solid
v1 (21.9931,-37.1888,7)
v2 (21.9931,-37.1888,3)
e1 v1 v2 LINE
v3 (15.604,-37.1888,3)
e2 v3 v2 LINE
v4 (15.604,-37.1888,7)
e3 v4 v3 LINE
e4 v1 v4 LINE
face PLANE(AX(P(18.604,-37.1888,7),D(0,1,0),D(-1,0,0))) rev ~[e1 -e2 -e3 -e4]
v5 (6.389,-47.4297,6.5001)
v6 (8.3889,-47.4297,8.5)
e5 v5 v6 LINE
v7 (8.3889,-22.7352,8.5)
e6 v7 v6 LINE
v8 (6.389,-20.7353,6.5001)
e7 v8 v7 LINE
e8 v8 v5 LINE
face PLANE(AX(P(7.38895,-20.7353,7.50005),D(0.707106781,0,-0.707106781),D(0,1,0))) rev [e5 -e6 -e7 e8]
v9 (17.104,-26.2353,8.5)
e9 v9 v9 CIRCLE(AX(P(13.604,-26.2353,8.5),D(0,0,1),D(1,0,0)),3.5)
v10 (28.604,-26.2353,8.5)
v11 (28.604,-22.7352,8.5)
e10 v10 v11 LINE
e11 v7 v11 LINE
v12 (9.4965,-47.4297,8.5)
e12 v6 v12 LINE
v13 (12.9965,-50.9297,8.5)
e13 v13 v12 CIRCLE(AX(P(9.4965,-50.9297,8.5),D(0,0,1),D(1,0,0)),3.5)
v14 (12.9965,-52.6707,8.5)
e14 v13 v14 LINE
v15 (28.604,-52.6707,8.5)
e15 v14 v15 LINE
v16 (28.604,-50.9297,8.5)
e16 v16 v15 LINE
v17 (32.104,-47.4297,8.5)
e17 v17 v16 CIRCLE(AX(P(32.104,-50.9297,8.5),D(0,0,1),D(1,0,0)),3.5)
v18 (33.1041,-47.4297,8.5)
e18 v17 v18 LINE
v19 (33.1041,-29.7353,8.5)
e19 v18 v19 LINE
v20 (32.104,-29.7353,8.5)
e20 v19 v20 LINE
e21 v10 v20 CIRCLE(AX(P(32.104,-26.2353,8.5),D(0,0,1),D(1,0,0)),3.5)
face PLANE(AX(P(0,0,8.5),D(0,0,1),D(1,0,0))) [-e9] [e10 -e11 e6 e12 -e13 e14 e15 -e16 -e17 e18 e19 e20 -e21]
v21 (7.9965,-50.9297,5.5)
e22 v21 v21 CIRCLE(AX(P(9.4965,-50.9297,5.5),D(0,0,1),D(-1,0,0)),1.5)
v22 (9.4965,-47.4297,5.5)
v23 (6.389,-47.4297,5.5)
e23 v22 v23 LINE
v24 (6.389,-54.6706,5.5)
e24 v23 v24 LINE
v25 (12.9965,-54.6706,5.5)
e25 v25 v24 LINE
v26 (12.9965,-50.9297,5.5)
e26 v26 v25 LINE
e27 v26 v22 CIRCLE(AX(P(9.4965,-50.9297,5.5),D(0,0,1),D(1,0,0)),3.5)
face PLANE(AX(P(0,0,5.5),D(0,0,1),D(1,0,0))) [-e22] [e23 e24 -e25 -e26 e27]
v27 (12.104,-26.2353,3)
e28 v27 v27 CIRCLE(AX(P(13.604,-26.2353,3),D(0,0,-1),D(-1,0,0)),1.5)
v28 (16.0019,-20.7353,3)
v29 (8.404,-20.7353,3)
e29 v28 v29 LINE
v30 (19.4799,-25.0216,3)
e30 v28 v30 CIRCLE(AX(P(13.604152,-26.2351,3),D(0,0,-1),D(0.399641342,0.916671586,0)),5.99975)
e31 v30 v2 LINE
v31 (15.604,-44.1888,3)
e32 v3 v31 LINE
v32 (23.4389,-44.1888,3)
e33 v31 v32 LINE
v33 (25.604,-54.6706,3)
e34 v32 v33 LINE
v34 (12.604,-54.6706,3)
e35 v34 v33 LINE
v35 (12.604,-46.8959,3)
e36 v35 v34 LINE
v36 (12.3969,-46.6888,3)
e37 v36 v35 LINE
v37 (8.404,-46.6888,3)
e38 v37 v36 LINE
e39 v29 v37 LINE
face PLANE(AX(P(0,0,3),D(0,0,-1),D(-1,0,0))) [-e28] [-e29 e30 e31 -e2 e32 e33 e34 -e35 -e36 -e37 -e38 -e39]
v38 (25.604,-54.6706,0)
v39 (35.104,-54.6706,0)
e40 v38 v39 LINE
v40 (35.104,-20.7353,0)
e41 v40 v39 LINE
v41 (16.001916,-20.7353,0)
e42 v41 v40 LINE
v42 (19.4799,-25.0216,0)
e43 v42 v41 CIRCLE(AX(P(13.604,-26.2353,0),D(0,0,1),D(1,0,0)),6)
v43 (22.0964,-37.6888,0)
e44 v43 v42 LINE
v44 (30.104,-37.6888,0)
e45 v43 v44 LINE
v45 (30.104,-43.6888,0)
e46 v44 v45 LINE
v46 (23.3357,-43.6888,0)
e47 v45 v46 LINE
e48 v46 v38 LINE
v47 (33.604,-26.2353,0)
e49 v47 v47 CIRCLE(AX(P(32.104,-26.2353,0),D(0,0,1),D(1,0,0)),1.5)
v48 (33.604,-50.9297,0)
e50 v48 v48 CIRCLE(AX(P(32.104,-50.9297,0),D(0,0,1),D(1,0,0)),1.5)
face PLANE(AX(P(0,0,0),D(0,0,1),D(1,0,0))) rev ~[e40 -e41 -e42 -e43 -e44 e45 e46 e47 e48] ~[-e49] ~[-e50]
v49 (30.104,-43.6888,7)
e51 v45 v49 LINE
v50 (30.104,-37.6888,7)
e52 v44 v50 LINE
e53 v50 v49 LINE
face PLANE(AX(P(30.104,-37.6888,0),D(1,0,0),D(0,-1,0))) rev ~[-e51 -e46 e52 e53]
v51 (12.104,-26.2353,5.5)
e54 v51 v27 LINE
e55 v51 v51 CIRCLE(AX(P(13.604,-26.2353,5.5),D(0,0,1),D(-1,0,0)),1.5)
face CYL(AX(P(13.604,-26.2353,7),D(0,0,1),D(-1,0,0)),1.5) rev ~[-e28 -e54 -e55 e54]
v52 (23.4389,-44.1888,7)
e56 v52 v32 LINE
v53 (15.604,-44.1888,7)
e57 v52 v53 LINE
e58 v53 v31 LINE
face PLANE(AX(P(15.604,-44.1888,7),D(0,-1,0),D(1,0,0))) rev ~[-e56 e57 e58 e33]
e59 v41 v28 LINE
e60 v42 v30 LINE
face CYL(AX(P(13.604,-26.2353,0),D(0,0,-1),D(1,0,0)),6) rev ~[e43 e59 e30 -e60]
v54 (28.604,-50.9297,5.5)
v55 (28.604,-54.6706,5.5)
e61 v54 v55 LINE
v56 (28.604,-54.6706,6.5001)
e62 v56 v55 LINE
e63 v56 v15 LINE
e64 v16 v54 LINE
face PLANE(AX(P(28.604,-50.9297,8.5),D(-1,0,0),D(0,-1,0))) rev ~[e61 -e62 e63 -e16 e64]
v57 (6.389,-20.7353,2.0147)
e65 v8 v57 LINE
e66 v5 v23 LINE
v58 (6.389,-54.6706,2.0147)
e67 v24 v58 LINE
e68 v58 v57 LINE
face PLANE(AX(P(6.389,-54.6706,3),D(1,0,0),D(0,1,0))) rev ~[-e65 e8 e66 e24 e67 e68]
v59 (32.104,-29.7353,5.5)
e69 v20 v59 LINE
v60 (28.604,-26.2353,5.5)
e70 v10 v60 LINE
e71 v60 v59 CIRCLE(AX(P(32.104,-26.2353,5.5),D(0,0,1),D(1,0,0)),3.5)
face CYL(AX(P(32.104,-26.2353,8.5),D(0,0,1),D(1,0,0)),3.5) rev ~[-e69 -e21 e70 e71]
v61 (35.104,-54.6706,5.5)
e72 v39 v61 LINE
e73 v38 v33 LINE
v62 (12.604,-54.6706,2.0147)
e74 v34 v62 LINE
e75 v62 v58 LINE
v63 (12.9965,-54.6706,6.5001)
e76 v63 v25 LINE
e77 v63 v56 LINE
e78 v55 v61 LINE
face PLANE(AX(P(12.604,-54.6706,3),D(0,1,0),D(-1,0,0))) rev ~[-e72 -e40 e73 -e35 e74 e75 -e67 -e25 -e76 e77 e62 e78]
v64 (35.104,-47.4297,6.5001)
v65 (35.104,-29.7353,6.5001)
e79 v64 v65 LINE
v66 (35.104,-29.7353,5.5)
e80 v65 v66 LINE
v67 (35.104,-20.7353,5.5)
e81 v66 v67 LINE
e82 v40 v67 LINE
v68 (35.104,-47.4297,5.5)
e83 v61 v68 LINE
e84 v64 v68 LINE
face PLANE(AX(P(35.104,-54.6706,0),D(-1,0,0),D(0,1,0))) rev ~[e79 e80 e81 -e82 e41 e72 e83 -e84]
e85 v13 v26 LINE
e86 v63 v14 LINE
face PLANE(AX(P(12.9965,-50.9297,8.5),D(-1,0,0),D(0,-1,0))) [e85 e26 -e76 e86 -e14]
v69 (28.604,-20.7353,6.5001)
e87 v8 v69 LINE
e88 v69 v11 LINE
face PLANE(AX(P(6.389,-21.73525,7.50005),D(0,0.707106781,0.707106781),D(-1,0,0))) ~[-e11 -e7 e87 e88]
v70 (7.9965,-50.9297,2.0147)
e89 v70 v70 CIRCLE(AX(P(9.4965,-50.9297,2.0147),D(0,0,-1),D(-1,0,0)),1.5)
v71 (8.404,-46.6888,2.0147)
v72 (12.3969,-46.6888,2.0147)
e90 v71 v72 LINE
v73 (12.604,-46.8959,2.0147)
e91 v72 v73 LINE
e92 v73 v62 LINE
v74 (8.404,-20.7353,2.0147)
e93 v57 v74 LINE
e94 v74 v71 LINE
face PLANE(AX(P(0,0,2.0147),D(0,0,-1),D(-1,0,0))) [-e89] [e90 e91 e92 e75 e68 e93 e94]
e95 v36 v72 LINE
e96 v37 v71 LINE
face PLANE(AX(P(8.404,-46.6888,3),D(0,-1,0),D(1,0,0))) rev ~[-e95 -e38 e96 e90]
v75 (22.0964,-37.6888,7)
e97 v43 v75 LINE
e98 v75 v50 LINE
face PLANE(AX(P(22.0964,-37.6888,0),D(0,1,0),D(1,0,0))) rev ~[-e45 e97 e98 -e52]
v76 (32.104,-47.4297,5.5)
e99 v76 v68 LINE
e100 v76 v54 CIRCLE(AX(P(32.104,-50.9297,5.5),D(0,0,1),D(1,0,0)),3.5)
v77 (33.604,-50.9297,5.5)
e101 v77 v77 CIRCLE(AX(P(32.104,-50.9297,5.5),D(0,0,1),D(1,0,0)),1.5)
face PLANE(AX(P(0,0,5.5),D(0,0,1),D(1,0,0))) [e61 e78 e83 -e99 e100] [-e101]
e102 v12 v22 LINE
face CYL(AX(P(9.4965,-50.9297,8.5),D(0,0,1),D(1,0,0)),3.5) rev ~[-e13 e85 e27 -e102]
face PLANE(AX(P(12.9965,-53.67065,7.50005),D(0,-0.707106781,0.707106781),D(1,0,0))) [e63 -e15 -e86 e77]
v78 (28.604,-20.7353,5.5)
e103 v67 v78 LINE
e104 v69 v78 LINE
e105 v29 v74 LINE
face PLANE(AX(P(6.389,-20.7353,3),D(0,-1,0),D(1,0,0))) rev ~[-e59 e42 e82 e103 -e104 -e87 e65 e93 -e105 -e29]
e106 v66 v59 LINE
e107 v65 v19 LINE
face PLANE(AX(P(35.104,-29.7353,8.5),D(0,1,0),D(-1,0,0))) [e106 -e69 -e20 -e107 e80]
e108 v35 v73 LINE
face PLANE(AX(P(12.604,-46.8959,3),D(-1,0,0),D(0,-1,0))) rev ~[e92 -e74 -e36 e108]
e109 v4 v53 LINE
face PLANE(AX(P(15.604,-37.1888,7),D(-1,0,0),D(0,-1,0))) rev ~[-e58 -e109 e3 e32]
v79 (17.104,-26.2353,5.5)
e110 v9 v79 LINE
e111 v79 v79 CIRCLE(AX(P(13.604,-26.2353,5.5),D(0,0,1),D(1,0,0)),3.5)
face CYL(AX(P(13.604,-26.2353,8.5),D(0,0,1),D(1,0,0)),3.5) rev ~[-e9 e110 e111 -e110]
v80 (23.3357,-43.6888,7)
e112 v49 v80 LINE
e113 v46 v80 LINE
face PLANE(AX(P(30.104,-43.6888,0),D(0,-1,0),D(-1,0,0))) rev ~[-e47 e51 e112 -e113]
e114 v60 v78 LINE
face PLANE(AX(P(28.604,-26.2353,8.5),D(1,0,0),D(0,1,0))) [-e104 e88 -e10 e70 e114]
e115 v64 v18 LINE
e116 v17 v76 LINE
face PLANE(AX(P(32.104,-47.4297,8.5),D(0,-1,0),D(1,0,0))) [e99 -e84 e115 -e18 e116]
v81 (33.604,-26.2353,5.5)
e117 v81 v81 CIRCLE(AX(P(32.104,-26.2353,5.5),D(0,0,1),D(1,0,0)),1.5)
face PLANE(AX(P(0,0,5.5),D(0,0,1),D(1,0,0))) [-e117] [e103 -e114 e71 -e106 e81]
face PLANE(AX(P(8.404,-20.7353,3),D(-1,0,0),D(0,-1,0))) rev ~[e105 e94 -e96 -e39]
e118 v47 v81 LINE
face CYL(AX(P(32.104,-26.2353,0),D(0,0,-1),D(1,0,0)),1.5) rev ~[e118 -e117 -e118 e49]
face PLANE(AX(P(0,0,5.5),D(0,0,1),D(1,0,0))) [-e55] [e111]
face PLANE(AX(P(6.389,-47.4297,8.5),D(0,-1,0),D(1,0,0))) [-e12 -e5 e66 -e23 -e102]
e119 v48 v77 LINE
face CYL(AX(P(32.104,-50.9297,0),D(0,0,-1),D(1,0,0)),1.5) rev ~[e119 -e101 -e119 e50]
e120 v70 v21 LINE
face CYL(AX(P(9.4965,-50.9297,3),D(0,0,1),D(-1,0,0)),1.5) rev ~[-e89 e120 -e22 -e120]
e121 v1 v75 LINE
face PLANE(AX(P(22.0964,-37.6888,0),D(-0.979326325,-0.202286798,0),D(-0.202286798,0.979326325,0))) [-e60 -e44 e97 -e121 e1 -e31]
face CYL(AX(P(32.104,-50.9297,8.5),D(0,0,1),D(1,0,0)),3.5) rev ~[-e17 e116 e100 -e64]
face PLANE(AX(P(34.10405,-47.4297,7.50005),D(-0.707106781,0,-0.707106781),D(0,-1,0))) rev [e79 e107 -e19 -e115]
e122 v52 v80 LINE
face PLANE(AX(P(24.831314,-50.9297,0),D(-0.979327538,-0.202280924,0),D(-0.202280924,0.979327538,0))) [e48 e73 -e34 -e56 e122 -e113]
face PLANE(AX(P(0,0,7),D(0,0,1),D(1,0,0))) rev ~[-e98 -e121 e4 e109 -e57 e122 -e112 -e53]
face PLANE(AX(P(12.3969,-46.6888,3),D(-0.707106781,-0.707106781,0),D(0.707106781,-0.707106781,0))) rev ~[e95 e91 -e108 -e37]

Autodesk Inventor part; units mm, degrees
ref_plane "YZ Plane" through (0, 0, 0) normal (1, 0, 0) x (0, 1, 0)
ref_plane "XZ Plane" through (0, 0, 0) normal (0, 1, 0) x (-1, 0, 0)
sketch "Sketch1" plane through (0, 0, 0) normal (0, 0, 1) x (1, 0, 0)
  circle A0 centre (13.604, -26.2353) radius 1.6 projected
  line L0 (18.604, -44.1888) -> (15.604, -44.1888) projected
  line L1 (15.604, -44.1888) -> (15.604, -37.1888) projected
  line L2 (15.604, -37.1888) -> (18.604, -37.1888) projected
  line L3 (18.604, -26.2353) -> (18.604, -37.1888) projected
  arc A1 (18.604, -26.2353) -> (8.604, -26.2353) centre (13.604, -26.2353) ccw projected
  line L4 (8.604, -26.2353) -> (8.604, -45.6888) projected
  line L5 (9.104, -46.1888) -> (8.604, -45.6888) projected
  line L6 (9.104, -46.1888) -> (12.604, -46.1888) projected
  line L7 (13.104, -46.6888) -> (12.604, -46.1888) projected
  line L8 (13.104, -46.6888) -> (13.104, -55.1706) projected
  line L9 (12.604, -55.6706) -> (13.104, -55.1706) projected
  line L10 (12.604, -55.6706) -> (3.2048, -55.6706) projected
  line L11 (3.2048, -55.6706) -> (3.2048, -62.5334) projected
  line L12 (3.2048, -62.5334) -> (8.604, -62.5334) projected
  line L13 (8.604, -62.5334) -> (8.604, -81.1802) projected
  line L14 (8.604, -81.1802) -> (9.604, -81.1802) projected
  line L15 (9.604, -62.5334) -> (9.604, -81.1802) projected
  line L16 (9.604, -62.5334) -> (17.604, -62.5334) projected
  line L17 (17.604, -81.1802) -> (17.604, -62.5334) projected
  line L18 (17.604, -81.1802) -> (18.604, -81.1802) projected
  line L19 (18.604, -44.1888) -> (18.604, -81.1802) projected
  line L20 (19.104, -37.6888) -> (16.104, -37.6888)
  line L21 (16.104, -37.6888) -> (16.104, -43.6888)
  line L22 (16.104, -43.6888) -> (19.104, -43.6888)
  line L23 (19.104, -43.6888) -> (19.104, -81.6802)
  line L24 (19.104, -81.6802) -> (17.104, -81.6802)
  line L25 (17.104, -81.6802) -> (17.104, -63.0334)
  line L26 (17.104, -63.0334) -> (10.104, -63.0334)
  line L27 (10.104, -63.0334) -> (10.104, -81.6802)
  line L28 (10.104, -81.6802) -> (8.104, -81.6802)
  line L29 (8.104, -81.6802) -> (8.104, -63.0334)
  line L30 (8.104, -63.0334) -> (2.7048, -63.0334)
  line L31 (2.7048, -63.0334) -> (2.7048, -55.1706)
  line L32 (2.7048, -55.1706) -> (12.3969, -55.1706)
  line L33 (12.3969, -55.1706) -> (12.604, -54.9635)
  line L34 (12.604, -54.9635) -> (12.604, -46.8959)
  line L35 (12.604, -46.8959) -> (12.3969, -46.6888)
  line L36 (12.3969, -46.6888) -> (8.8969, -46.6888)
  line L37 (8.8969, -46.6888) -> (8.104, -45.8959)
  line L38 (8.104, -45.8959) -> (8.104, -26.2353)
  arc A2 (19.104, -26.2353) -> (8.104, -26.2353) centre (13.604, -26.2353) ccw
  line L39 (19.104, -26.2353) -> (19.104, -37.6888)
  line L40 (30.104, -37.6888) -> (30.104, -43.6888)
  line L41 (19.604, -38.1888) -> (16.604, -38.1888)
  line L42 (16.604, -38.1888) -> (16.604, -43.1888)
  line L43 (16.604, -43.1888) -> (19.604, -43.1888)
  line L44 (19.604, -43.1888) -> (19.604, -82.1802)
  line L45 (19.604, -82.1802) -> (16.604, -82.1802)
  line L46 (16.604, -82.1802) -> (16.604, -63.5334)
  line L47 (16.604, -63.5334) -> (10.604, -63.5334)
  line L48 (10.604, -63.5334) -> (10.604, -82.1802)
  line L49 (10.604, -82.1802) -> (7.604, -82.1802)
  line L50 (7.604, -82.1802) -> (7.604, -63.5334)
  line L51 (7.604, -63.5334) -> (2.2048, -63.5334)
  line L52 (2.2048, -63.5334) -> (2.2048, -54.6706)
  line L53 (2.2048, -54.6706) -> (12.104, -54.6706)
  line L54 (12.104, -54.6706) -> (12.104, -47.1888)
  line L55 (12.104, -47.1888) -> (8.6898, -47.1888)
  line L56 (8.6898, -47.1888) -> (7.604, -46.103)
  line L57 (7.604, -46.103) -> (7.604, -26.2353)
  arc A3 (19.604, -26.2353) -> (7.604, -26.2353) centre (13.604, -26.2353) ccw
  line L58 (19.604, -26.2353) -> (19.604, -38.1888)
  circle A4 centre (9.4965, -50.9297) radius 1.5 projected
  line L59 (30.104, -37.6888) -> (35.104, -37.6888)
  line L60 (13.604, -20.7353) -> (35.104, -20.7353)
  line L61 (13.604, -20.7353) -> (35.104, -20.7353) construction
  line L62 (12.104, -54.6706) -> (35.104, -54.6706)
  line L63 (35.104, -54.6706) -> (35.104, -20.7353)
  line L64 (6.389, 0.2) -> (6.389, -55.4706) projected
  line L65 (19.604, -54.6706) -> (25.604, -54.6706)
  line L66 (35.104, -20.7353) -> (32.104, -20.7353)
  line L67 (32.104, -24.7353) -> (32.104, -52.4297)
  line L68 (9.4965, -50.9297) -> (32.104, -50.9297)
  circle A5 centre (32.104, -26.2353) radius 1.5
  circle A6 centre (32.104, -50.9297) radius 1.5
  line L69 (25.604, -54.6706) -> (23.3357, -43.6888)
  line L70 (16.104, -37.6888) -> (19.604, -37.6888)
  line L71 (22.0964, -37.6888) -> (30.104, -37.6888)
  line L72 (30.104, -43.6888) -> (23.3357, -43.6888)
  line L73 (19.604, -43.6888) -> (19.104, -43.6888)
  line L74 (22.0964, -37.6888) -> (19.4799, -25.0216)
  line L75 (18.5946, -20.7353) -> (18.0297, -18.0002)
  line L76 (13.604, -26.2353) -> (19.7306, -26.2353)
  line L77 (30.604, -26.2353) -> (32.104, -26.2353)
  point P0 (0, 0)
  point P1 (16.0019, -20.7353)
  dimension "d10" = 3
  dimension "d0" = 0.5
  dimension "d2" = 14
  dimension "d3" = 0.5
  dimension "d4" = 5
  dimension "d5" = 0
  dimension "d6" = 3.1842
  dimension "d7" = 6
  dimension "d8" = 3
  dimension "d9" = 3
extrude "Extrusion1" add sketch "Sketch1" along normal blind 7 contours L69 L72 L40 L59 L67 A6 L68 | L68 A6 L67 L59 L63 L62 L69 | L60 L63 L59 L71 L74 A3
sketch "Sketch2" plane through (0, 0, 7) normal (0, 0, 1) x (1, 0, 0)
  line L0 (25.604, -54.6706) -> (35.104, -54.6706) projected
  line L1 (35.104, -54.6706) -> (35.104, -20.7353) projected
  line L2 (35.104, -20.7353) -> (16.0019, -20.7353) projected
  arc A0 (19.4799, -25.0216) -> (16.0019, -20.7353) centre (13.604, -26.2353) ccw projected
  line L3 (19.4799, -25.0216) -> (22.0964, -37.6888) projected
  line L4 (22.0964, -37.6888) -> (30.104, -37.6888) projected
  line L5 (30.104, -37.6888) -> (30.104, -43.6888) projected
  line L6 (30.104, -43.6888) -> (23.3357, -43.6888) projected
  line L7 (23.3357, -43.6888) -> (25.604, -54.6706) projected
  circle A1 centre (32.104, -50.9297) radius 1.5 projected
  circle A2 centre (32.104, -26.2353) radius 1.5 projected
  circle A3 centre (13.604, -26.2353) radius 1.5 projected
  circle A4 centre (9.4965, -50.9297) radius 1.5 projected
  line L8 (6.389, 0.2) -> (6.389, -55.4706) projected
  line L9 (35.104, -20.7353) -> (6.389, -20.7353)
  line L10 (25.604, -54.6706) -> (35.104, -54.6706) projected
  line L11 (35.104, -54.6706) -> (6.389, -54.6706)
  point P0 (0, 0)
extrude "Extrusion2" add sketch "Sketch2" along normal blind 1.5
sketch "Sketch3" plane through (0, 0, 7) normal (0, 0, -1) x (-1, 0, 0)
  line L0 (-15.604, -37.1888) -> (-15.604, -44.1888) projected
  line L1 (-18.604, -37.1888) -> (-15.604, -37.1888) projected
  line L2 (-15.604, -44.1888) -> (-18.604, -44.1888) projected
  line L3 (-19.4799, -25.0216) -> (-22.0964, -37.6888) projected
  arc A0 (-16.0019, -20.7353) -> (-19.4799, -25.0216) centre (-13.604, -26.2353) ccw projected
  line L4 (-16.0019, -20.7353) -> (-6.389, -20.7353) projected
  line L5 (-6.389, -78.3802) -> (-6.389, 0.2) projected
  line L6 (-6.389, -54.6706) -> (-25.604, -54.6706) projected
  line L7 (-23.3357, -43.6888) -> (-25.604, -54.6706) projected
  line L8 (-15.604, -37.1888) -> (-21.9931, -37.1888)
  line L9 (-15.604, -44.1888) -> (-23.4389, -44.1888)
  circle A1 centre (-13.604, -26.2353) radius 1.5 projected
  circle A2 centre (-9.4965, -50.9297) radius 1.5 projected
  point P0 (0, 0)
extrude "Extrusion3" add sketch "Sketch3" along normal blind 4
sketch "Sketch4" plane through (0, 0, 8.5) normal (0, 0, 1) x (1, 0, 0)
  circle A0 centre (32.104, -26.2353) radius 1.5 projected
  circle A1 centre (13.604, -26.2353) radius 1.5 projected
  circle A2 centre (9.4965, -50.9297) radius 1.5 projected
  circle A3 centre (32.104, -50.9297) radius 1.5 projected
  circle A4 centre (32.104, -26.2353) radius 3.5
  circle A5 centre (13.604, -26.2353) radius 3.5
  circle A6 centre (32.104, -50.9297) radius 3.5
  circle A7 centre (9.4965, -50.9297) radius 3.5
  line L0 (35.104, -54.6706) -> (35.104, -20.7353) projected
  line L1 (6.389, -54.6706) -> (35.104, -54.6706) projected
  line L2 (6.5058, -78.3802) -> (6.5058, 0.2)
  line L3 (9.4965, -47.4297) -> (6.5058, -47.4297)
  line L4 (12.9965, -50.9297) -> (12.9965, -54.6706)
  line L5 (28.604, -50.9297) -> (28.604, -54.6706)
  line L6 (32.104, -47.4297) -> (35.104, -47.4297)
  line L7 (35.104, -29.7353) -> (32.104, -29.7353)
  line L8 (28.604, -26.2353) -> (28.604, -20.7353)
  line L9 (35.104, -20.7353) -> (16.0019, -20.7353) projected
  point P0 (0, 0)
  point P1 (6.5058, -54.6706)
  dimension "d17" = 7
  dimension "d18" = 7
  dimension "d19" = 7
  dimension "d20" = 7
extrude "Extrusion4" cut sketch "Sketch4" against normal blind 3 contours A4 L0 | L8 L9 L0 A4 | A4 L0 L7 | A5 | A6 L0 | L6 L0 A6 | A6 L0 L1 L5 | A7 L2 | L4 L1 L2 A7 | A7 L2 L3 picked at (34.604, -26.2353) picked at (34.604, -50.9297) picked at (7.0027, -50.9297)
sketch "Sketch5" plane through (0, 0, 8.5) normal (0, 0, 1) x (1, 0, 0)
  line L0 (6.5058, -54.6706) -> (6.5058, -47.4297) projected
  line L1 (6.389, -54.6706) -> (6.5058, -54.6706) projected
  line L2 (6.389, -20.7353) -> (6.389, -54.6706) projected
  line L3 (6.5058, -54.6706) -> (6.1522, -54.6706)
  line L4 (6.1522, -54.6706) -> (6.1522, -47.4297)
  line L5 (6.1522, -47.4297) -> (6.5058, -47.4297)
  line L6 (6.5058, -47.4297) -> (6.5058, -54.6706)
  point P0 (0, 0)
extrude "Extrusion5" cut sketch "Sketch5" against normal up to surface (3 mm away)
chamfer "Chamfer1" distance 2 angle 45 4 edges at (6.389, -34.0825, 8.5) (35.104, -38.5825, 8.5) (17.4965, -20.7353, 8.5) (20.8002, -54.6706, 8.5)
sketch "Sketch6" plane through (0, 0, 3) normal (0, 0, -1) x (-1, 0, 0)
  line L0 (-6.389, -54.6706) -> (-6.389, -20.7353) projected
  line L1 (-6.389, -55.1706) -> (-12.3969, -55.1706) projected
  line L2 (-12.604, -54.9635) -> (-12.3969, -55.1706) projected
  line L3 (-12.604, -46.8959) -> (-12.604, -54.9635) projected
  line L4 (-12.3969, -46.6888) -> (-12.604, -46.8959) projected
  line L5 (-8.404, -46.6888) -> (-12.3969, -46.6888) projected
  line L6 (-8.404, -20.7353) -> (-8.404, -46.6888) projected
  line L7 (-8.404, 3) -> (-8.404, -20.7353) projected
  line L8 (3.1786, 3) -> (-8.404, 3) projected
  line L9 (3.1786, 0.2) -> (3.1786, 3) projected
  line L10 (3.1786, 0.2) -> (-6.389, 0.2) projected
  line L11 (-6.389, 0.2) -> (-6.389, -55.1706) projected
  circle A0 centre (-9.4965, -50.9297) radius 1.5 projected
  line L12 (-6.389, -20.7353) -> (-16.0019, -20.7353) projected
  line L13 (-25.604, -54.6706) -> (-6.389, -54.6706) projected
  point P0 (0, 0)
  point P1 (-12.604, -54.6706)
ref_plane "Work Plane1" through (-23.745, -60.7506, 2.0147) normal (0, 0, 1) x (1, 0, 0)
extrude "Extrusion6" add sketch "Sketch6" along normal up to surface (0.9853 mm away) contours L13 L3 L4 L5 L6 L12 L0
properties part number "LatchCover_3DPrint"
